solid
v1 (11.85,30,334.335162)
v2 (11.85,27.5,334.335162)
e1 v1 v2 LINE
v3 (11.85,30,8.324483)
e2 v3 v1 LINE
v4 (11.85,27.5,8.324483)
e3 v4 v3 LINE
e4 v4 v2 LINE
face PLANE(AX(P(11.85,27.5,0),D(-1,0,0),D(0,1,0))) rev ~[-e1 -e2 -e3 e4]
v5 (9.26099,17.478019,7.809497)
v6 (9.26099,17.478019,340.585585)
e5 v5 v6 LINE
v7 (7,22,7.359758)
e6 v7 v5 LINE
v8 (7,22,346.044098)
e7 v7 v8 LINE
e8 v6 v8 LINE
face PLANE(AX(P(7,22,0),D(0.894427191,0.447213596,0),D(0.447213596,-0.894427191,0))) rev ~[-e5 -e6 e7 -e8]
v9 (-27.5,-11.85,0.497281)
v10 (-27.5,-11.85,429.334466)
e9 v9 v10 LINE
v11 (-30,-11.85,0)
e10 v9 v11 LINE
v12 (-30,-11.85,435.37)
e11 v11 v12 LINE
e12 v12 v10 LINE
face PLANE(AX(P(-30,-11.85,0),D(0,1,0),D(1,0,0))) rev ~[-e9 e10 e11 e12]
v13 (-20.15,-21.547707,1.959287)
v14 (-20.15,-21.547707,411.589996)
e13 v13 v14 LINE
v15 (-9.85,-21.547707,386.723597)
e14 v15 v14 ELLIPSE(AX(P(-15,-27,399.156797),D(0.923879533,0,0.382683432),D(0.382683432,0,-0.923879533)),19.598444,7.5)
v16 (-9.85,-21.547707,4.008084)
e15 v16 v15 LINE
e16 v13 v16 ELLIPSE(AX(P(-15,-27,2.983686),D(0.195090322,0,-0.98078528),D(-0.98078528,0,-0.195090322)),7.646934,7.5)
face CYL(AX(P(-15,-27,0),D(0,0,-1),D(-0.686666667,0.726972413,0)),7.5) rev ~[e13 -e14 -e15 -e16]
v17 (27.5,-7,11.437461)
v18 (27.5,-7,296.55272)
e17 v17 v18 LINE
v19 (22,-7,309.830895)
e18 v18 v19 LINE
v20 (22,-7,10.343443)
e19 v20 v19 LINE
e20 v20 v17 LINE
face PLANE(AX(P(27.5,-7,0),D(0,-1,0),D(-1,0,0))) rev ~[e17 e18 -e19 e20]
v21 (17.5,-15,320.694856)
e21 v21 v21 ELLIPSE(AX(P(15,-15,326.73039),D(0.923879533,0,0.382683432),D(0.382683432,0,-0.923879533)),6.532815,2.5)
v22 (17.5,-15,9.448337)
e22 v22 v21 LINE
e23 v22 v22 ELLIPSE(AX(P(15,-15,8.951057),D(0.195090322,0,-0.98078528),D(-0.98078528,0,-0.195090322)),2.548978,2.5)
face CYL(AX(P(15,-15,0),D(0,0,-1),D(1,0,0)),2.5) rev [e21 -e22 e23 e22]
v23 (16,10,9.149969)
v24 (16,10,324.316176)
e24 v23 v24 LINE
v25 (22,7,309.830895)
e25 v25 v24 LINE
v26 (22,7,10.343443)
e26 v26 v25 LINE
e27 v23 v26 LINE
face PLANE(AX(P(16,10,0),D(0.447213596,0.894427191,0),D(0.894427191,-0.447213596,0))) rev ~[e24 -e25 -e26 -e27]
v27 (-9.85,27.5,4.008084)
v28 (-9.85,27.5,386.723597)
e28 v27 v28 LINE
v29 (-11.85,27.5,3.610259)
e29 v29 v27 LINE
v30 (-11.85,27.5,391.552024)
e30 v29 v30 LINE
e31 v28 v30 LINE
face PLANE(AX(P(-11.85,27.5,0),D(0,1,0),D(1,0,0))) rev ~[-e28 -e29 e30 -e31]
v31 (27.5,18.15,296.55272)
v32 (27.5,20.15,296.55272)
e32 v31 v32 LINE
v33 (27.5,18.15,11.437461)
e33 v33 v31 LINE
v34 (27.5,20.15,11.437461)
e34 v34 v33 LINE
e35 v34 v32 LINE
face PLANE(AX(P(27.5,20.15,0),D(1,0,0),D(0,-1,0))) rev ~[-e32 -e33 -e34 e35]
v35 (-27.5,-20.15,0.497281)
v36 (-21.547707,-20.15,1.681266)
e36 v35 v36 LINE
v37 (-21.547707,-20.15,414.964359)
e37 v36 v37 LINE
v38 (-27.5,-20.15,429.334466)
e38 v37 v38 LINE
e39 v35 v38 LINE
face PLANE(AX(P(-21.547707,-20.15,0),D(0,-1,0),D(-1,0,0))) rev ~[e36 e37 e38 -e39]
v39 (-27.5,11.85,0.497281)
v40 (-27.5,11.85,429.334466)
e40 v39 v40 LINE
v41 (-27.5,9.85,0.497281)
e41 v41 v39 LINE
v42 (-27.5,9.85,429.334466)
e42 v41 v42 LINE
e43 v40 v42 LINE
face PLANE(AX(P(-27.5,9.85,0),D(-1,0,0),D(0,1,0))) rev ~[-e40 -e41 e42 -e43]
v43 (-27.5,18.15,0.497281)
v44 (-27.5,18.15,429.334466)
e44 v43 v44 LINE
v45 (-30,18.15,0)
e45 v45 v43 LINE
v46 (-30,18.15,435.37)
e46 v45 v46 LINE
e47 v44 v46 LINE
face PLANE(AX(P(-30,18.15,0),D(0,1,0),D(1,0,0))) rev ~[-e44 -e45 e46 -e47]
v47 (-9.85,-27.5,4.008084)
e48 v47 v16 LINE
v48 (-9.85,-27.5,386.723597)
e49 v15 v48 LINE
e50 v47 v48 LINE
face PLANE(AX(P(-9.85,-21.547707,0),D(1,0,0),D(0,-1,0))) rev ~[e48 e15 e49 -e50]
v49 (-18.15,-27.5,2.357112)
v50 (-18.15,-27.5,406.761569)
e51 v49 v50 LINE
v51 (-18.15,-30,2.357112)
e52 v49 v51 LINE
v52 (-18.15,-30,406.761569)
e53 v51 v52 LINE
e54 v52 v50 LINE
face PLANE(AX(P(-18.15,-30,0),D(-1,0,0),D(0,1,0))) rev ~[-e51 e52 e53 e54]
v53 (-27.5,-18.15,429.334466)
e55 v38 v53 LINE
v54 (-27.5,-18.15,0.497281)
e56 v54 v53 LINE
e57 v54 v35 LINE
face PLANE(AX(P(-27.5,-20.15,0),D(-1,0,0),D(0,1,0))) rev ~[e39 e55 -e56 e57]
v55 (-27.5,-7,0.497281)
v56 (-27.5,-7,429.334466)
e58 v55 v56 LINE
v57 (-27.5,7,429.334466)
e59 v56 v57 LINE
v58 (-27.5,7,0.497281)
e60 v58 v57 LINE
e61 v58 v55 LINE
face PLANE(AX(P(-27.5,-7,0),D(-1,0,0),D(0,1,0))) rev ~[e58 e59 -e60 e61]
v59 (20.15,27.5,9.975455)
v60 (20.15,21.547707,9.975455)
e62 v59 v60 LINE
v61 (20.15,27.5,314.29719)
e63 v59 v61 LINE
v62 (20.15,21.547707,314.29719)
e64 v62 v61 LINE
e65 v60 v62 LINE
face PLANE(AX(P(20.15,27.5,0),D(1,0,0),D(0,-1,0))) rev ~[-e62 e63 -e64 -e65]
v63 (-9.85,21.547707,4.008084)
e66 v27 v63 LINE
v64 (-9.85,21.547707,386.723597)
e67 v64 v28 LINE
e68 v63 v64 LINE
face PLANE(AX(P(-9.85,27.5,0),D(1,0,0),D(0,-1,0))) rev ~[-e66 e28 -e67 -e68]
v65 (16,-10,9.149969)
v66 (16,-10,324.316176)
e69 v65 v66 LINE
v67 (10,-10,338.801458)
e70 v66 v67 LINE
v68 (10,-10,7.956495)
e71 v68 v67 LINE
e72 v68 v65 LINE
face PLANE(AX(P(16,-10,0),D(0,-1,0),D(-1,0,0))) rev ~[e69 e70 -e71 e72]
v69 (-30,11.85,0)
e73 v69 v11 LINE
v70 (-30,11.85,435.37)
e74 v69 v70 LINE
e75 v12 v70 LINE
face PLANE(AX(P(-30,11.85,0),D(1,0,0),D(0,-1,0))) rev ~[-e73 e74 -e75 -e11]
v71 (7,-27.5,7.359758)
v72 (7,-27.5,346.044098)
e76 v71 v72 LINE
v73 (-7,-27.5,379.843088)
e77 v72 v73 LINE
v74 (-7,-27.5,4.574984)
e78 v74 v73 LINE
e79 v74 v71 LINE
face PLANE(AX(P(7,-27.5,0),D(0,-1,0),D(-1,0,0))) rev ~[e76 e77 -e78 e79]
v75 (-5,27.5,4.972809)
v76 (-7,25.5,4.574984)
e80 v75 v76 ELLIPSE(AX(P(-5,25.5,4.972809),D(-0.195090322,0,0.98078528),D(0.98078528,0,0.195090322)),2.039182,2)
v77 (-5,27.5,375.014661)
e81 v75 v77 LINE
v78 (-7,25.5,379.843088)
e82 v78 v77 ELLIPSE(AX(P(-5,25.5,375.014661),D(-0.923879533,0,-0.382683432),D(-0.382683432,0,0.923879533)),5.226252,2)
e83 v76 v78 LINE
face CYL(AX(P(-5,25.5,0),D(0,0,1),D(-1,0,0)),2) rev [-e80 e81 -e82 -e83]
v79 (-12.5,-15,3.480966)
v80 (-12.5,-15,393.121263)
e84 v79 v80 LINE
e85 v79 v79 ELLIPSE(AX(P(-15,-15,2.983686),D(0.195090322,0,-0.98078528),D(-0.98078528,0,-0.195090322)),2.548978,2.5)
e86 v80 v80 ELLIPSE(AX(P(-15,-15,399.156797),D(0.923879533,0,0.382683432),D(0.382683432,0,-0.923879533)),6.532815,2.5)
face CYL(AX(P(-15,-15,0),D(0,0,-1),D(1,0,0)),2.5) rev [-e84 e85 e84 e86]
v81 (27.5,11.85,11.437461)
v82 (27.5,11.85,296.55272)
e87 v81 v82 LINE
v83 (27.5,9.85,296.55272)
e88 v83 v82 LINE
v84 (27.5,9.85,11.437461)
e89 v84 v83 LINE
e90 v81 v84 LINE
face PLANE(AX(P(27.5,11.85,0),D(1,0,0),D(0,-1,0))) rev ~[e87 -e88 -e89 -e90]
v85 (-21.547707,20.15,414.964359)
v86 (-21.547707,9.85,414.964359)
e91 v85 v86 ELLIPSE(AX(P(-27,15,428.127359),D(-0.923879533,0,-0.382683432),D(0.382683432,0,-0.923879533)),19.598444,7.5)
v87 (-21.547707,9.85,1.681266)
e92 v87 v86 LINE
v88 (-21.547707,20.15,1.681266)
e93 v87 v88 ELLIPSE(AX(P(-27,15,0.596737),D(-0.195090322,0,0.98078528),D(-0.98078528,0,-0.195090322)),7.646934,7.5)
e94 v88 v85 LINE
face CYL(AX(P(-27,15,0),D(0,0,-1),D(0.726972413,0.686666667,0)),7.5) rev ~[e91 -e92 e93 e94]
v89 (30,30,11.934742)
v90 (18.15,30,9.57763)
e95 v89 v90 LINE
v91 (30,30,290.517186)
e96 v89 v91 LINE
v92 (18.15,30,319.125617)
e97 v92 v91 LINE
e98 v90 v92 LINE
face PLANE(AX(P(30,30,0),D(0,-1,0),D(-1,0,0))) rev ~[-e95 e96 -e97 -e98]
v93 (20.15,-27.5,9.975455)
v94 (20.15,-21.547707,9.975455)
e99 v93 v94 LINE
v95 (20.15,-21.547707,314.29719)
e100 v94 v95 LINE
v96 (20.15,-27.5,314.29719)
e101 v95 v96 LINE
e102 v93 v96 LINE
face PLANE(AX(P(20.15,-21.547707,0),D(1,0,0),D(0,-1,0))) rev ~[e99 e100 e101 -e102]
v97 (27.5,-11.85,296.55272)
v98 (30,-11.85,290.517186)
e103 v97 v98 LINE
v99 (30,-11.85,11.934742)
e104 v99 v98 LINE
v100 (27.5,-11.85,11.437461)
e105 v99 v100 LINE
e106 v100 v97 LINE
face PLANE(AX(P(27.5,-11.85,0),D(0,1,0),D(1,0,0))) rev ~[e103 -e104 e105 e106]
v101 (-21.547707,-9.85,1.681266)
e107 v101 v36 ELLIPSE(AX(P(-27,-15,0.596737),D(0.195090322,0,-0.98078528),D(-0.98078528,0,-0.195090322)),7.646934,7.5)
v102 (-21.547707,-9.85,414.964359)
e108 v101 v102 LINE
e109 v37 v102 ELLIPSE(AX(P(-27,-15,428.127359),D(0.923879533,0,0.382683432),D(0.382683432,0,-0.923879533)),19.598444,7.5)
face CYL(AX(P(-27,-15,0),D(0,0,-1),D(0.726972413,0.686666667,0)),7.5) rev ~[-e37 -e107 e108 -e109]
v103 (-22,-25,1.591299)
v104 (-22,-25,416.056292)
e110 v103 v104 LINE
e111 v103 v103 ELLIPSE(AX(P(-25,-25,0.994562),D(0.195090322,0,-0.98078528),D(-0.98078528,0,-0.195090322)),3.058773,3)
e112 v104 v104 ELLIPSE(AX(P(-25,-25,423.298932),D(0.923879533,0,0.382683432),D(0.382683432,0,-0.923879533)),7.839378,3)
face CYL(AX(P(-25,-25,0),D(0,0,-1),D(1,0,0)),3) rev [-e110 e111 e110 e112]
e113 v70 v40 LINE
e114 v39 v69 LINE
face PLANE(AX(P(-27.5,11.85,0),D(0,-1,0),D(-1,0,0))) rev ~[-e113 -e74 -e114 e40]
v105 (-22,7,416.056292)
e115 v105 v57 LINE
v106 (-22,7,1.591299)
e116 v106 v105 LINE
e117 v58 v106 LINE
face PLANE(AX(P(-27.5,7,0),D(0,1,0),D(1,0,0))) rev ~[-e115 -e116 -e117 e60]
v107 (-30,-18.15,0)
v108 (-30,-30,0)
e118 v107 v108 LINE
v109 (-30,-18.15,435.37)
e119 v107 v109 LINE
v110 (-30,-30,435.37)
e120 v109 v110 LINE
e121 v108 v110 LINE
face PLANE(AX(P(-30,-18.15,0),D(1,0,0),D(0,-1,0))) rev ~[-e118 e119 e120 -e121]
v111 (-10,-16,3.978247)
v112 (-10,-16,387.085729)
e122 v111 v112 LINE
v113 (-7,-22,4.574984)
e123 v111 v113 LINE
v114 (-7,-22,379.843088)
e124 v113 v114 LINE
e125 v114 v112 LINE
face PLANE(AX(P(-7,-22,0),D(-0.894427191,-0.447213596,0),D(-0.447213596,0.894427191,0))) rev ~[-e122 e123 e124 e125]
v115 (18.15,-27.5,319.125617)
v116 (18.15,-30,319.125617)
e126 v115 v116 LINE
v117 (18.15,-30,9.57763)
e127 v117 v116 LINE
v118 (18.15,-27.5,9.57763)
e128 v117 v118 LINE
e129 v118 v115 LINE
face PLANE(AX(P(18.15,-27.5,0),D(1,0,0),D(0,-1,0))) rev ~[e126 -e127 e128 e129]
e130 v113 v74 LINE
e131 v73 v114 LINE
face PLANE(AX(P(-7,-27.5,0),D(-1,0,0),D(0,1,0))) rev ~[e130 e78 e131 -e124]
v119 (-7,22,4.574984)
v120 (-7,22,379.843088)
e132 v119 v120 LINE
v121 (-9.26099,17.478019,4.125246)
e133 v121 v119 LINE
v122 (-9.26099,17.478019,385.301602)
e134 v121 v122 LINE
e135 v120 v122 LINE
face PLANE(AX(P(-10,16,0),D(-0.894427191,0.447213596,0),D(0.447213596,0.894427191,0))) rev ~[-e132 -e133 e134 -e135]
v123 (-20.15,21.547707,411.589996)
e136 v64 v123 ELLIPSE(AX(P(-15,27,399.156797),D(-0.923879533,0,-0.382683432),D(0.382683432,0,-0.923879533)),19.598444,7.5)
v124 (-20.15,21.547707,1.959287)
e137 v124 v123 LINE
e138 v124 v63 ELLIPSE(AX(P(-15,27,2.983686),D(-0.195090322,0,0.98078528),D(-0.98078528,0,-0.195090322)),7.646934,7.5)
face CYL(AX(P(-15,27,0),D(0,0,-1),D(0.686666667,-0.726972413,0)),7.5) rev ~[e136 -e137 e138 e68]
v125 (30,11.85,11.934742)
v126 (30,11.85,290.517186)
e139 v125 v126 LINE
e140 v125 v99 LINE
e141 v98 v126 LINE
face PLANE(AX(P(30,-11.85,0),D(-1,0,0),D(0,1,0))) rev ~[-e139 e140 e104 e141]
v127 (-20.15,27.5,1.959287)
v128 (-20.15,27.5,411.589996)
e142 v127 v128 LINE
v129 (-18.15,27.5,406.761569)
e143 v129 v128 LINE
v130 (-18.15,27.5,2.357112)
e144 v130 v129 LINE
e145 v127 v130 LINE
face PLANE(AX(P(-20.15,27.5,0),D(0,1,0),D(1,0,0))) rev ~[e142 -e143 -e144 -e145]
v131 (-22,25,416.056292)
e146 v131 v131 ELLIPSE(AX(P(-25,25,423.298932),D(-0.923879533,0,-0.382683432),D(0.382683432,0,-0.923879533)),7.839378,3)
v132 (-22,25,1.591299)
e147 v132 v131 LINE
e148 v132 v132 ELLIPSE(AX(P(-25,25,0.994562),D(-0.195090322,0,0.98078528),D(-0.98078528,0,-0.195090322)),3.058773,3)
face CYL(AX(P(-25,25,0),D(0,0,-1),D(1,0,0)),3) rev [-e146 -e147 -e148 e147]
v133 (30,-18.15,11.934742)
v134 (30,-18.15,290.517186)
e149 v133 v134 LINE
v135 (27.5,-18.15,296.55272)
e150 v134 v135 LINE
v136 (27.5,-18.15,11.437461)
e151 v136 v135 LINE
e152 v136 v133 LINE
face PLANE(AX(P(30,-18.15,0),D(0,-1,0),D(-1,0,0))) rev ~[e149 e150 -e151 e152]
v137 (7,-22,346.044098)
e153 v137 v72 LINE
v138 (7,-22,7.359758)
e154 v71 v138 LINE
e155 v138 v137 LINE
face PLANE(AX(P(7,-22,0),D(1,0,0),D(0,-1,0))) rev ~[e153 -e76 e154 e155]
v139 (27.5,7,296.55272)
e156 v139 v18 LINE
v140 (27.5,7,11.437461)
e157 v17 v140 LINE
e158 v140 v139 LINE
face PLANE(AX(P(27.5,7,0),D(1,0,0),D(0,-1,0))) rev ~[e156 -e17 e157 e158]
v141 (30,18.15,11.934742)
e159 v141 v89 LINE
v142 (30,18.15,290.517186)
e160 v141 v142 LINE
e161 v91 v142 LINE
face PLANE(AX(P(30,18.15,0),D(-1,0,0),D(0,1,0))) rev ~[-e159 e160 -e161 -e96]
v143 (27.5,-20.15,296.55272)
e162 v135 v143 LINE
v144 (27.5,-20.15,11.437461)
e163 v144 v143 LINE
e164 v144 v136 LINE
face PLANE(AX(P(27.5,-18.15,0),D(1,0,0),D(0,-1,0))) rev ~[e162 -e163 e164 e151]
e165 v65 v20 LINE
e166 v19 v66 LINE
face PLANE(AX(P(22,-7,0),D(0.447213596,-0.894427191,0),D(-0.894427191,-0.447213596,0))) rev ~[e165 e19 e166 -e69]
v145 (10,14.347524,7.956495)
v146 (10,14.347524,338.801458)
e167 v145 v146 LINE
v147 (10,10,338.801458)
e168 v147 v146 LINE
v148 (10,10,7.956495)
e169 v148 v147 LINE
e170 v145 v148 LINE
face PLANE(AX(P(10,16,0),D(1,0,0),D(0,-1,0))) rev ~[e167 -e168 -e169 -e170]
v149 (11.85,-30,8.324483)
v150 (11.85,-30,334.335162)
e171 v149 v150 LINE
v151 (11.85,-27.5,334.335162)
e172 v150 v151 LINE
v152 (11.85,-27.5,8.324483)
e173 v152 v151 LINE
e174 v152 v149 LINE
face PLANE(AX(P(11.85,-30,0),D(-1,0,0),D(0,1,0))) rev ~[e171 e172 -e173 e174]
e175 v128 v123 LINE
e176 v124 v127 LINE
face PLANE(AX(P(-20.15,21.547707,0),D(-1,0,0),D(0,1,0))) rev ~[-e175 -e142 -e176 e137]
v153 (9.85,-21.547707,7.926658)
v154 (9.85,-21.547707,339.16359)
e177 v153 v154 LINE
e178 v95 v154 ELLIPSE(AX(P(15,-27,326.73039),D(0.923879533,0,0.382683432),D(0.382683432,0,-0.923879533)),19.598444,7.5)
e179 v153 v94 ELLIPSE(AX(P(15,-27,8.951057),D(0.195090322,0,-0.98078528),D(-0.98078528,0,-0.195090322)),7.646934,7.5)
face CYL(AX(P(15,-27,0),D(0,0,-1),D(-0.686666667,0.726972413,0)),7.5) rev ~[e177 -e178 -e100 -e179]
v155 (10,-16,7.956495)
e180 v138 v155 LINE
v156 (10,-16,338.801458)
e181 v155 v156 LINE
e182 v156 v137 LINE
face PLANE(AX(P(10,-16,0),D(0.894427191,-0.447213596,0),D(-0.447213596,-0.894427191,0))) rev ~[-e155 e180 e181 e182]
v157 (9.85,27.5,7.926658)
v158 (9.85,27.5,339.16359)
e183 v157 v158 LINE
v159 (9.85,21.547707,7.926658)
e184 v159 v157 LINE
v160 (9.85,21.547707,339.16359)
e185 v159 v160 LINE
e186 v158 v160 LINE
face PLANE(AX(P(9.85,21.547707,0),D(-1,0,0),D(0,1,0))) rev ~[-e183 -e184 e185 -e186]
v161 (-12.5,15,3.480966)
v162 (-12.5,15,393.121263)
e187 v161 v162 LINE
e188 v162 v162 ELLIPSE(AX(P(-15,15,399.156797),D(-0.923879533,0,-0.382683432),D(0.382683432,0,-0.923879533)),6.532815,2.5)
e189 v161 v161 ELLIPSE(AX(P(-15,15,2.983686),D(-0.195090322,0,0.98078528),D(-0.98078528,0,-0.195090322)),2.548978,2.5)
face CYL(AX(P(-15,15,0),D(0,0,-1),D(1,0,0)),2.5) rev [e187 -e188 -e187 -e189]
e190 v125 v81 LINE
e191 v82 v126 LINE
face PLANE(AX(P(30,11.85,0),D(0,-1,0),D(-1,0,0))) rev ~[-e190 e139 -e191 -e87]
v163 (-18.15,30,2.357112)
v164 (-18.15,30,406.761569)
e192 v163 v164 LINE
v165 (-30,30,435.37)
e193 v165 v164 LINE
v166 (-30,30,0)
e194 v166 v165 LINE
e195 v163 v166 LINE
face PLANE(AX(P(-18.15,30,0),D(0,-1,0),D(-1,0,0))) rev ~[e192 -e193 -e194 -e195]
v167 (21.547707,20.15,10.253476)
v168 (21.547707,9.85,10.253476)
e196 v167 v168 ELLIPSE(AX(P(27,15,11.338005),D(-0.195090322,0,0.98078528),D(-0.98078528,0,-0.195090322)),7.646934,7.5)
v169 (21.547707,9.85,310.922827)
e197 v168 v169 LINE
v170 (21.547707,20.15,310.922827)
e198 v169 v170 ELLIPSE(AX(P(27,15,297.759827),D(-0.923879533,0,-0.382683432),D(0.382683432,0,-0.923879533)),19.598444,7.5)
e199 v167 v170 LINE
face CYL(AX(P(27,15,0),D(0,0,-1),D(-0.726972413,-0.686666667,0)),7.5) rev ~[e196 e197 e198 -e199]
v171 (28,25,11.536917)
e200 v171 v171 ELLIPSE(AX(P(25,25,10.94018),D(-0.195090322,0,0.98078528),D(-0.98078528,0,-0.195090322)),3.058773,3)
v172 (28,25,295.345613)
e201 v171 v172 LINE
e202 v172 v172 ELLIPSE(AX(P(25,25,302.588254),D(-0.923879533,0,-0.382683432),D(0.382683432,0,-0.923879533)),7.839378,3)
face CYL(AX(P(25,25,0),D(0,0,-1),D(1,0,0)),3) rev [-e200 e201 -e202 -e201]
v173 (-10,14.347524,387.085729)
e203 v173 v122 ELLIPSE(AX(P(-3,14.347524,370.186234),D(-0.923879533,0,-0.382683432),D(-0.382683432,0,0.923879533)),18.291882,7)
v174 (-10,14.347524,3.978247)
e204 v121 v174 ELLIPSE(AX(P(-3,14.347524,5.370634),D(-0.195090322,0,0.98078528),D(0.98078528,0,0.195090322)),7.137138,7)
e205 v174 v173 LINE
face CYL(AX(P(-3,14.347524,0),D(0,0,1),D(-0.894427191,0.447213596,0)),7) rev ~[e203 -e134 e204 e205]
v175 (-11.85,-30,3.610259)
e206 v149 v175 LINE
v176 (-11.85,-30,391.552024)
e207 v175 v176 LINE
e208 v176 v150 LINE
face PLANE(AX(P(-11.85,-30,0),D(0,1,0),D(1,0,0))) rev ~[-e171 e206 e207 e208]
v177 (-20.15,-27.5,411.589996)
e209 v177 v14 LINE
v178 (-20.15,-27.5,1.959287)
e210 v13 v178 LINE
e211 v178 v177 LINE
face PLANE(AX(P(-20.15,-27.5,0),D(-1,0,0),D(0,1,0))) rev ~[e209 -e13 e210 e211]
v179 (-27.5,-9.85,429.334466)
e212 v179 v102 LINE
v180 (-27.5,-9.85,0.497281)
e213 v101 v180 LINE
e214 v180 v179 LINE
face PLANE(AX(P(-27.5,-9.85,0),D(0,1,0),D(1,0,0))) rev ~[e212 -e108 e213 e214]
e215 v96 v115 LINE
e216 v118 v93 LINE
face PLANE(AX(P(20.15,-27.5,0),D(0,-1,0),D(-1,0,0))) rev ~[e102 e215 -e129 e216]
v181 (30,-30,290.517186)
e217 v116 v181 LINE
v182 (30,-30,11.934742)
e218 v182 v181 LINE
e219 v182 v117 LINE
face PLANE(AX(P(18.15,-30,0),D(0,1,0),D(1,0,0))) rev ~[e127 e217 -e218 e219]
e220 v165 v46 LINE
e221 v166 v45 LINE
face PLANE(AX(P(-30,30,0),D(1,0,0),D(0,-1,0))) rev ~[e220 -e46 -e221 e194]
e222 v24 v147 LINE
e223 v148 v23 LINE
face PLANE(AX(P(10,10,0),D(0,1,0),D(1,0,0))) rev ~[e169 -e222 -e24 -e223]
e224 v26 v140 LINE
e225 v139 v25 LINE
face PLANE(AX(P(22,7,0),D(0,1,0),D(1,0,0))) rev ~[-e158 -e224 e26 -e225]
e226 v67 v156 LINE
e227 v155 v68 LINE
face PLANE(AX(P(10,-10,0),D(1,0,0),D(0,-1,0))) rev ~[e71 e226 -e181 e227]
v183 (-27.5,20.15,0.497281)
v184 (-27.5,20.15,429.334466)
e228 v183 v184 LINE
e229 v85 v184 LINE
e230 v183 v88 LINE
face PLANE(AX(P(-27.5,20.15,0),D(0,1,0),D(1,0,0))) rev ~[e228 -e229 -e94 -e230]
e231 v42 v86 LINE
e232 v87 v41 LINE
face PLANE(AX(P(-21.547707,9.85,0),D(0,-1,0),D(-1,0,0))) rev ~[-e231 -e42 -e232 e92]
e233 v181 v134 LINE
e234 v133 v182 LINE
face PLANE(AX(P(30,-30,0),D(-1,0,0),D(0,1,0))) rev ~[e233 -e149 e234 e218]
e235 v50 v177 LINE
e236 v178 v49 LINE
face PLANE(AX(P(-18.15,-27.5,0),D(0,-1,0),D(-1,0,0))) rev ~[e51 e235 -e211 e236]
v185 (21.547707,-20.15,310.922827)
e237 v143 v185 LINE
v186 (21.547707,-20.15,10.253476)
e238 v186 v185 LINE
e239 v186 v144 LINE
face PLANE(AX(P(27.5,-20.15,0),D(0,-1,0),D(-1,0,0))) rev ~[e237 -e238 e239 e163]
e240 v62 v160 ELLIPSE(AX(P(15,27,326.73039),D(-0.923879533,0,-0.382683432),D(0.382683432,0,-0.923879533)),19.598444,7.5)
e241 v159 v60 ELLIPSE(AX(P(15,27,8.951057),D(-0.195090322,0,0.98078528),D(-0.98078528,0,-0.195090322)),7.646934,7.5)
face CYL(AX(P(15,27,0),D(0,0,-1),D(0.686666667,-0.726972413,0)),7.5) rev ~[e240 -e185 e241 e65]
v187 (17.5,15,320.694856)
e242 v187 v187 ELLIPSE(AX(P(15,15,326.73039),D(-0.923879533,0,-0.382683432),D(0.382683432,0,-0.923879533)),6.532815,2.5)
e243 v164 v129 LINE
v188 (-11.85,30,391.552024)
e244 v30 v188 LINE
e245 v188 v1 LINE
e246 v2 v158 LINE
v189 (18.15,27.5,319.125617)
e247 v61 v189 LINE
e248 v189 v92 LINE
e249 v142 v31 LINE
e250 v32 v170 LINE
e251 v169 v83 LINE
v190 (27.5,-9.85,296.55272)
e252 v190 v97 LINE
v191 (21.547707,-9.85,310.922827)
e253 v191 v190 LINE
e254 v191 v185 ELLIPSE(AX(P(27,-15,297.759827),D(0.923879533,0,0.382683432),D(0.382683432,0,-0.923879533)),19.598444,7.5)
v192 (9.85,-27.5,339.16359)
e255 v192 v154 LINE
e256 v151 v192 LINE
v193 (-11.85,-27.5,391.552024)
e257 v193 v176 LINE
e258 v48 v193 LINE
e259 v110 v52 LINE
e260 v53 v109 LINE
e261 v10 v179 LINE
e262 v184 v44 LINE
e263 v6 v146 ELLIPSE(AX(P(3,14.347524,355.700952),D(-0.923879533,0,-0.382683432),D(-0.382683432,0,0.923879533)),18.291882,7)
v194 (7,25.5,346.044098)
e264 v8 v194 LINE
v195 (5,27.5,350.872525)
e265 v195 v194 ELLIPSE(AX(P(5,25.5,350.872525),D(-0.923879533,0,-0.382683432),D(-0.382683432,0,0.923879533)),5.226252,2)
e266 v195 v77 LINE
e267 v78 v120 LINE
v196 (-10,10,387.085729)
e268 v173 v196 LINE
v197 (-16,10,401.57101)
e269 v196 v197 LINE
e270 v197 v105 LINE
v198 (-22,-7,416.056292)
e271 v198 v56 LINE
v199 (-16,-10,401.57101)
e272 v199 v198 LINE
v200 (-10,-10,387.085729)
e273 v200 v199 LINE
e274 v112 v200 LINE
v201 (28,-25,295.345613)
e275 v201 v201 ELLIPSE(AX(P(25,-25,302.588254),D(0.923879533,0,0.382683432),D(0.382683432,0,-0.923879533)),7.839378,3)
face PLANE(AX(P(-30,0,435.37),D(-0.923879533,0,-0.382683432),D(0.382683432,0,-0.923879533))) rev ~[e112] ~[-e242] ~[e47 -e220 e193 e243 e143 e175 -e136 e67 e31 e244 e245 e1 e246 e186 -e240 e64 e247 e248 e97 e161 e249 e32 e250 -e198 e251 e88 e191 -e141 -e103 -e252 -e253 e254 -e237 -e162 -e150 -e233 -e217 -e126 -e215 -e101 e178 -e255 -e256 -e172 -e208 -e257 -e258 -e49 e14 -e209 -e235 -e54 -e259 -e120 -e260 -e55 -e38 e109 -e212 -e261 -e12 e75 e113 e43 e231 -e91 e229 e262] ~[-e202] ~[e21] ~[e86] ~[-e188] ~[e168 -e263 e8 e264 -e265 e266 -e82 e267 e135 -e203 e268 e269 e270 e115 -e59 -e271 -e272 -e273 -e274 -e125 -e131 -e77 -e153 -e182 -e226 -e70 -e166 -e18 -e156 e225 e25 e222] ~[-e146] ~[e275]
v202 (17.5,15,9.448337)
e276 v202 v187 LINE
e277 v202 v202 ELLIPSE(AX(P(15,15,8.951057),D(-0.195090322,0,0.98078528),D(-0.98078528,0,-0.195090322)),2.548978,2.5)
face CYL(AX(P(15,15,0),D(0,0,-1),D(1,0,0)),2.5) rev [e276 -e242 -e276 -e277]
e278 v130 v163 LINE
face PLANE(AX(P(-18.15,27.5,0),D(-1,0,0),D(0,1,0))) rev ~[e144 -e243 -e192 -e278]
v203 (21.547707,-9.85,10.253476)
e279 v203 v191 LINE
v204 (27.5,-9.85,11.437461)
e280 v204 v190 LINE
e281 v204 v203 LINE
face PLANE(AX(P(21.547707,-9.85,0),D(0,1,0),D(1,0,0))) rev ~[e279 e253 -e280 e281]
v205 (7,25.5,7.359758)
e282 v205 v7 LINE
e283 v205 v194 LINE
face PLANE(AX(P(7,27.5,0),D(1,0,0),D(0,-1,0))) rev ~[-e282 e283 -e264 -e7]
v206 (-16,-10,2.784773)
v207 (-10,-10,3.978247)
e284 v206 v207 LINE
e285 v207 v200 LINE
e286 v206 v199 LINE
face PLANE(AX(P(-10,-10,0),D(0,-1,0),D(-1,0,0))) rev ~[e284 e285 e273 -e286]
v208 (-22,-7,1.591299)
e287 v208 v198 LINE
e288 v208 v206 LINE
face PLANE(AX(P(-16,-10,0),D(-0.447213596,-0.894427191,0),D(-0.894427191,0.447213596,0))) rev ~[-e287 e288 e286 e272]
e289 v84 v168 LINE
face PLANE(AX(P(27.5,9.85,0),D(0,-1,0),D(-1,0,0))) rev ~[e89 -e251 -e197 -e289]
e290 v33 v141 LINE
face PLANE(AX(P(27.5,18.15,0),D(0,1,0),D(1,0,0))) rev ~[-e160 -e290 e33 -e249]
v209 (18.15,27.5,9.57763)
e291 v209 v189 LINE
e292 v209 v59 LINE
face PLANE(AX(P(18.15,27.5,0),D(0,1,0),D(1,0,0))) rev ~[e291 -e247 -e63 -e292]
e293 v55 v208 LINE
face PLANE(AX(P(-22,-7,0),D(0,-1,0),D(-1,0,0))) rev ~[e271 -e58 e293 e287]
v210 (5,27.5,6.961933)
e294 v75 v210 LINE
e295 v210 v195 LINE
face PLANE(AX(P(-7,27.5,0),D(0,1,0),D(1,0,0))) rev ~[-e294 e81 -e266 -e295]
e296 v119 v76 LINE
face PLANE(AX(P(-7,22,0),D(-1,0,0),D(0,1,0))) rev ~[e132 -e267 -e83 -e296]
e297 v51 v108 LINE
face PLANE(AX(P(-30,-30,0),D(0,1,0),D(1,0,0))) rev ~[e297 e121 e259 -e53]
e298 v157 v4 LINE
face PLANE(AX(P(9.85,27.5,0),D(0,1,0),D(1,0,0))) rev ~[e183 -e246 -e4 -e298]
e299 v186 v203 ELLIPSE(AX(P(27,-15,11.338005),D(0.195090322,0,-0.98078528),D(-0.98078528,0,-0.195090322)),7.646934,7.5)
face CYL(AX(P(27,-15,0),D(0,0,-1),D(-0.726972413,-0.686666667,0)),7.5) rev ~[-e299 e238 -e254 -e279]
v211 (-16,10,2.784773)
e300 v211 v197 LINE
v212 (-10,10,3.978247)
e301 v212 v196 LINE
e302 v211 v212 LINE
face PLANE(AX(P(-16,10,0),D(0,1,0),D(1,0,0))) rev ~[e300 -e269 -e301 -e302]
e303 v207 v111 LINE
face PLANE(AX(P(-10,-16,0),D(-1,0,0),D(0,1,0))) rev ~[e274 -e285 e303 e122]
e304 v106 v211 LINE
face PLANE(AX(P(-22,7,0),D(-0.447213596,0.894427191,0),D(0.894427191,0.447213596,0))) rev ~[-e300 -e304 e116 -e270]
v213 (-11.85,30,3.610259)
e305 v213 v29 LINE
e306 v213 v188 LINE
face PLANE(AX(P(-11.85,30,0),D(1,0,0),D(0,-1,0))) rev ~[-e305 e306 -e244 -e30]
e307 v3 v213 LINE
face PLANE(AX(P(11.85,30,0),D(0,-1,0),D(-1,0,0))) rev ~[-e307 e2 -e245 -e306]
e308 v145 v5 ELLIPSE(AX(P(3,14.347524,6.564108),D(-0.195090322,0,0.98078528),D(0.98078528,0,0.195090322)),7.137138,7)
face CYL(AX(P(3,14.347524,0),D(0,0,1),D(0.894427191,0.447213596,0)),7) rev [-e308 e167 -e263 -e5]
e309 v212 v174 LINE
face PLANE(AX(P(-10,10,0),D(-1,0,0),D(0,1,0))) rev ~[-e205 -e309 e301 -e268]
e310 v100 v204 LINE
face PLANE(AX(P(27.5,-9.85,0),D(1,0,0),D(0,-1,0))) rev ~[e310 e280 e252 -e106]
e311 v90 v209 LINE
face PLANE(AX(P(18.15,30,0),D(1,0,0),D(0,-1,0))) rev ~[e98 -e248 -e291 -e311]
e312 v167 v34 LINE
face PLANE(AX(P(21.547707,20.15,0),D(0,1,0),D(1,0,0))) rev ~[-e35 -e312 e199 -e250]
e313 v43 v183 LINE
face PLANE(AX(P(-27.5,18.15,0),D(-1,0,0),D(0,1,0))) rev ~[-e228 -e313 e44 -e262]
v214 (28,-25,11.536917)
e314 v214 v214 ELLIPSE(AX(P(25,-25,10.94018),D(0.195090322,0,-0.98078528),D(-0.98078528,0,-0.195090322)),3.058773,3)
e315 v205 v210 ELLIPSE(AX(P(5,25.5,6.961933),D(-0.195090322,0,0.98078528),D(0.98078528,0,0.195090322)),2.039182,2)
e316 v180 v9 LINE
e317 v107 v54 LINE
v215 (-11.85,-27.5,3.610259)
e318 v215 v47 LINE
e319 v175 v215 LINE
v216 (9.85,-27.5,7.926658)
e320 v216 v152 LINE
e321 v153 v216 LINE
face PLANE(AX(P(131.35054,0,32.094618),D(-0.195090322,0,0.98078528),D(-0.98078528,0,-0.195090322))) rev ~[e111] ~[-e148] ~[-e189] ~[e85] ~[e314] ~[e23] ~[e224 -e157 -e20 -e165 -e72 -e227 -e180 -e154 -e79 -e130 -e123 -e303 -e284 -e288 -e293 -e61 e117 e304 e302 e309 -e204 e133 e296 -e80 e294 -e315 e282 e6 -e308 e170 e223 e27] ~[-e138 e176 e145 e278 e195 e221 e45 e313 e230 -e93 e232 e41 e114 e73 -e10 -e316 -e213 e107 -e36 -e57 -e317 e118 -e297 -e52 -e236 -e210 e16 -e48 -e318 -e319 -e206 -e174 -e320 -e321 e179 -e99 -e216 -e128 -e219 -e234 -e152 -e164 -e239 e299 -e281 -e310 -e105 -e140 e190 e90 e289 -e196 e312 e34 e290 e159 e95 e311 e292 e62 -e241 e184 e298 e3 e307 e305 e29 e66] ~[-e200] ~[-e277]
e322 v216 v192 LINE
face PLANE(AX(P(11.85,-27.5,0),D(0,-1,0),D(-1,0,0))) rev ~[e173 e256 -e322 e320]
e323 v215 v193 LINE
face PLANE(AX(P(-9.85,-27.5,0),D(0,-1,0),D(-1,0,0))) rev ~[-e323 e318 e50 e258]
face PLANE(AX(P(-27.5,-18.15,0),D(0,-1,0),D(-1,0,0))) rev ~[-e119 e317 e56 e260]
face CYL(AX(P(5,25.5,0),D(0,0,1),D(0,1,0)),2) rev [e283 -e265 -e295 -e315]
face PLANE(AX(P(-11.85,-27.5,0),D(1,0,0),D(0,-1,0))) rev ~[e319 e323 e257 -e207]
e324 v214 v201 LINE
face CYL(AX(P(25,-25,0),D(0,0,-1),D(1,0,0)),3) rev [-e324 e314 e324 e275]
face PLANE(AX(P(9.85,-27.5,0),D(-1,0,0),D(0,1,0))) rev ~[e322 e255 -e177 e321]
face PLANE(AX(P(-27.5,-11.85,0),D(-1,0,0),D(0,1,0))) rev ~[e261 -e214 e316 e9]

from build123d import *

# Parameters (mm, degrees)
F0_R          = 3
F0_R_2        = 2.5
F1_DEPTH      = 435.37
F2_R          = 2
F3_R          = 7
F5_DEPTH      = 30
F5_DEPTH_BACK = 30


# Not quite as in the source:
# - a feature names something its author has since deleted; it is built from what else it names


with BuildPart() as f1:
    # F0 (on Top) → F1 (new body)
    with BuildSketch(Plane.XY):
        with BuildLine():
            Line((18.15, -30), (30, -30))
            Line((30, -30), (30, -18.15))
            Line((30, -18.15), (27.5, -18.15))
            Line((27.5, -18.15), (27.5, -20.15))
            Line((27.5, -20.15), (21.5477069044, -20.15))
            ThreePointArc((21.5477069044, -20.15), (19.5, -15), (21.5477069044, -9.85))
            Line((21.5477069044, -9.85), (27.5, -9.85))
            Line((27.5, -9.85), (27.5, -11.85))
            Line((27.5, -11.85), (30, -11.85))
            Line((30, -11.85), (30, 11.85))
            Line((30, 11.85), (27.5, 11.85))
            Line((27.5, 11.85), (27.5, 9.85))
            Line((27.5, 9.85), (21.5477069044, 9.85))
            ThreePointArc((21.5477069044, 9.85), (19.5, 15), (21.5477069044, 20.15))
            Line((21.5477069044, 20.15), (27.5, 20.15))
            Line((27.5, 20.15), (27.5, 18.15))
            Line((27.5, 18.15), (30, 18.15))
            Line((30, 18.15), (30, 30))
            Line((30, 30), (18.15, 30))
            Line((18.15, 30), (18.15, 27.5))
            Line((18.15, 27.5), (20.15, 27.5))
            Line((20.15, 27.5), (20.15, 21.5477069044))
            ThreePointArc((20.15, 21.5477069044), (15, 19.5), (9.85, 21.5477069044))
            Line((9.85, 21.5477069044), (9.85, 27.5))
            Line((9.85, 27.5), (11.85, 27.5))
            Line((11.85, 27.5), (11.85, 30))
            Line((11.85, 30), (-11.85, 30))
            Line((-11.85, 30), (-11.85, 27.5))
            Line((-11.85, 27.5), (-9.85, 27.5))
            Line((-9.85, 27.5), (-9.85, 21.5477069044))
            ThreePointArc((-9.85, 21.5477069044), (-15, 19.5), (-20.15, 21.5477069044))
            Line((-20.15, 21.5477069044), (-20.15, 27.5))
            Line((-20.15, 27.5), (-18.15, 27.5))
            Line((-18.15, 27.5), (-18.15, 30))
            Line((-18.15, 30), (-30, 30))
            Line((-30, 30), (-30, 18.15))
            Line((-30, 18.15), (-27.5, 18.15))
            Line((-27.5, 18.15), (-27.5, 20.15))
            Line((-27.5, 20.15), (-21.5477069044, 20.15))
            ThreePointArc((-21.5477069044, 20.15), (-19.5, 15), (-21.5477069044, 9.85))
            Line((-21.5477069044, 9.85), (-27.5, 9.85))
            Line((-27.5, 9.85), (-27.5, 11.85))
            Line((-27.5, 11.85), (-30, 11.85))
            Line((-30, 11.85), (-30, -11.85))
            Line((-30, -11.85), (-27.5, -11.85))
            Line((-27.5, -11.85), (-27.5, -9.85))
            Line((-27.5, -9.85), (-21.5477069044, -9.85))
            ThreePointArc((-21.5477069044, -9.85), (-19.5, -15), (-21.5477069044, -20.15))
            Line((-21.5477069044, -20.15), (-27.5, -20.15))
            Line((-27.5, -20.15), (-27.5, -18.15))
            Line((-27.5, -18.15), (-30, -18.15))
            Line((-30, -18.15), (-30, -30))
            Line((-30, -30), (-18.15, -30))
            Line((-18.15, -30), (-18.15, -27.5))
            Line((-18.15, -27.5), (-20.15, -27.5))
            Line((-20.15, -27.5), (-20.15, -21.5477069044))
            ThreePointArc((-20.15, -21.5477069044), (-15, -19.5), (-9.85, -21.5477069044))
            Line((-9.85, -21.5477069044), (-9.85, -27.5))
            Line((-9.85, -27.5), (-11.85, -27.5))
            Line((-11.85, -27.5), (-11.85, -30))
            Line((-11.85, -30), (11.85, -30))
            Line((11.85, -30), (11.85, -27.5))
            Line((11.85, -27.5), (9.85, -27.5))
            Line((9.85, -27.5), (9.85, -21.5477069044))
            ThreePointArc((9.85, -21.5477069044), (15, -19.5), (20.15, -21.5477069044))
            Line((20.15, -21.5477069044), (20.15, -27.5))
            Line((20.15, -27.5), (18.15, -27.5))
            Line((18.15, -27.5), (18.15, -30))
        make_face()
        with Locations((-25, -25)):
            Circle(F0_R, mode=Mode.SUBTRACT)
        with Locations((-15, -15)):
            Circle(F0_R_2, mode=Mode.SUBTRACT)
        with Locations((25, -25)):
            Circle(F0_R, mode=Mode.SUBTRACT)
        with Locations((15, -15)):
            Circle(F0_R_2, mode=Mode.SUBTRACT)
        with Locations((-25, 25)):
            Circle(F0_R, mode=Mode.SUBTRACT)
        with Locations((-15, 15)):
            Circle(F0_R_2, mode=Mode.SUBTRACT)
        Polygon((-7, 22), (-7, 27.5), (0, 27.5), (7, 27.5), (7, 22), (10, 16), (10, 10), (16, 10), (22, 7), (27.5, 7), (27.5, 0), (27.5, -7), (22, -7), (16, -10), (10, -10), (10, -16), (7, -22), (7, -27.5), (0, -27.5), (-7, -27.5), (-7, -22), (-10, -16), (-10, -10), (-16, -10), (-22, -7), (-27.5, -7), (-27.5, 0), (-27.5, 7), (-22, 7), (-16, 10), (-10, 10), (-10, 16), align=None, mode=Mode.SUBTRACT)
        with Locations((15, 15)):
            Circle(F0_R_2, mode=Mode.SUBTRACT)
        with Locations((25, 25)):
            Circle(F0_R, mode=Mode.SUBTRACT)
    extrude(amount=F1_DEPTH)

    # F2
    f2_edges = [f1.edges().sort_by_distance(p)[0] for p in [
        (-7, 27.5, 217.685),
        (7, 27.5, 217.685),
    ]]
    fillet(f2_edges, radius=F2_R)

    # F3
    f3_edges = [f1.edges().sort_by_distance(p)[0] for p in [
        (-10, 16, 217.685),
        (10, 16, 217.685),
    ]]
    fillet(f3_edges, radius=F3_R)

    # F4 (on Front) → F5 (cut, two sides)
    with BuildSketch(Plane.XZ) as f5_sk:
        Polygon((14.7787195251, -225.1178250754), (176.1292593185, -193.0232072271), (131.3505397934, 32.0946178483), (-30, 0), align=None)
        Polygon((207.062683369, 533.564578584), (-30, 435.37), (64.6696372736, 206.8172777492), (301.7323206426, 305.0118563332), align=None)
    extrude(amount=F5_DEPTH, mode=Mode.SUBTRACT)
    extrude(f5_sk.sketch, amount=-F5_DEPTH_BACK, mode=Mode.SUBTRACT)


solid = f1.part
